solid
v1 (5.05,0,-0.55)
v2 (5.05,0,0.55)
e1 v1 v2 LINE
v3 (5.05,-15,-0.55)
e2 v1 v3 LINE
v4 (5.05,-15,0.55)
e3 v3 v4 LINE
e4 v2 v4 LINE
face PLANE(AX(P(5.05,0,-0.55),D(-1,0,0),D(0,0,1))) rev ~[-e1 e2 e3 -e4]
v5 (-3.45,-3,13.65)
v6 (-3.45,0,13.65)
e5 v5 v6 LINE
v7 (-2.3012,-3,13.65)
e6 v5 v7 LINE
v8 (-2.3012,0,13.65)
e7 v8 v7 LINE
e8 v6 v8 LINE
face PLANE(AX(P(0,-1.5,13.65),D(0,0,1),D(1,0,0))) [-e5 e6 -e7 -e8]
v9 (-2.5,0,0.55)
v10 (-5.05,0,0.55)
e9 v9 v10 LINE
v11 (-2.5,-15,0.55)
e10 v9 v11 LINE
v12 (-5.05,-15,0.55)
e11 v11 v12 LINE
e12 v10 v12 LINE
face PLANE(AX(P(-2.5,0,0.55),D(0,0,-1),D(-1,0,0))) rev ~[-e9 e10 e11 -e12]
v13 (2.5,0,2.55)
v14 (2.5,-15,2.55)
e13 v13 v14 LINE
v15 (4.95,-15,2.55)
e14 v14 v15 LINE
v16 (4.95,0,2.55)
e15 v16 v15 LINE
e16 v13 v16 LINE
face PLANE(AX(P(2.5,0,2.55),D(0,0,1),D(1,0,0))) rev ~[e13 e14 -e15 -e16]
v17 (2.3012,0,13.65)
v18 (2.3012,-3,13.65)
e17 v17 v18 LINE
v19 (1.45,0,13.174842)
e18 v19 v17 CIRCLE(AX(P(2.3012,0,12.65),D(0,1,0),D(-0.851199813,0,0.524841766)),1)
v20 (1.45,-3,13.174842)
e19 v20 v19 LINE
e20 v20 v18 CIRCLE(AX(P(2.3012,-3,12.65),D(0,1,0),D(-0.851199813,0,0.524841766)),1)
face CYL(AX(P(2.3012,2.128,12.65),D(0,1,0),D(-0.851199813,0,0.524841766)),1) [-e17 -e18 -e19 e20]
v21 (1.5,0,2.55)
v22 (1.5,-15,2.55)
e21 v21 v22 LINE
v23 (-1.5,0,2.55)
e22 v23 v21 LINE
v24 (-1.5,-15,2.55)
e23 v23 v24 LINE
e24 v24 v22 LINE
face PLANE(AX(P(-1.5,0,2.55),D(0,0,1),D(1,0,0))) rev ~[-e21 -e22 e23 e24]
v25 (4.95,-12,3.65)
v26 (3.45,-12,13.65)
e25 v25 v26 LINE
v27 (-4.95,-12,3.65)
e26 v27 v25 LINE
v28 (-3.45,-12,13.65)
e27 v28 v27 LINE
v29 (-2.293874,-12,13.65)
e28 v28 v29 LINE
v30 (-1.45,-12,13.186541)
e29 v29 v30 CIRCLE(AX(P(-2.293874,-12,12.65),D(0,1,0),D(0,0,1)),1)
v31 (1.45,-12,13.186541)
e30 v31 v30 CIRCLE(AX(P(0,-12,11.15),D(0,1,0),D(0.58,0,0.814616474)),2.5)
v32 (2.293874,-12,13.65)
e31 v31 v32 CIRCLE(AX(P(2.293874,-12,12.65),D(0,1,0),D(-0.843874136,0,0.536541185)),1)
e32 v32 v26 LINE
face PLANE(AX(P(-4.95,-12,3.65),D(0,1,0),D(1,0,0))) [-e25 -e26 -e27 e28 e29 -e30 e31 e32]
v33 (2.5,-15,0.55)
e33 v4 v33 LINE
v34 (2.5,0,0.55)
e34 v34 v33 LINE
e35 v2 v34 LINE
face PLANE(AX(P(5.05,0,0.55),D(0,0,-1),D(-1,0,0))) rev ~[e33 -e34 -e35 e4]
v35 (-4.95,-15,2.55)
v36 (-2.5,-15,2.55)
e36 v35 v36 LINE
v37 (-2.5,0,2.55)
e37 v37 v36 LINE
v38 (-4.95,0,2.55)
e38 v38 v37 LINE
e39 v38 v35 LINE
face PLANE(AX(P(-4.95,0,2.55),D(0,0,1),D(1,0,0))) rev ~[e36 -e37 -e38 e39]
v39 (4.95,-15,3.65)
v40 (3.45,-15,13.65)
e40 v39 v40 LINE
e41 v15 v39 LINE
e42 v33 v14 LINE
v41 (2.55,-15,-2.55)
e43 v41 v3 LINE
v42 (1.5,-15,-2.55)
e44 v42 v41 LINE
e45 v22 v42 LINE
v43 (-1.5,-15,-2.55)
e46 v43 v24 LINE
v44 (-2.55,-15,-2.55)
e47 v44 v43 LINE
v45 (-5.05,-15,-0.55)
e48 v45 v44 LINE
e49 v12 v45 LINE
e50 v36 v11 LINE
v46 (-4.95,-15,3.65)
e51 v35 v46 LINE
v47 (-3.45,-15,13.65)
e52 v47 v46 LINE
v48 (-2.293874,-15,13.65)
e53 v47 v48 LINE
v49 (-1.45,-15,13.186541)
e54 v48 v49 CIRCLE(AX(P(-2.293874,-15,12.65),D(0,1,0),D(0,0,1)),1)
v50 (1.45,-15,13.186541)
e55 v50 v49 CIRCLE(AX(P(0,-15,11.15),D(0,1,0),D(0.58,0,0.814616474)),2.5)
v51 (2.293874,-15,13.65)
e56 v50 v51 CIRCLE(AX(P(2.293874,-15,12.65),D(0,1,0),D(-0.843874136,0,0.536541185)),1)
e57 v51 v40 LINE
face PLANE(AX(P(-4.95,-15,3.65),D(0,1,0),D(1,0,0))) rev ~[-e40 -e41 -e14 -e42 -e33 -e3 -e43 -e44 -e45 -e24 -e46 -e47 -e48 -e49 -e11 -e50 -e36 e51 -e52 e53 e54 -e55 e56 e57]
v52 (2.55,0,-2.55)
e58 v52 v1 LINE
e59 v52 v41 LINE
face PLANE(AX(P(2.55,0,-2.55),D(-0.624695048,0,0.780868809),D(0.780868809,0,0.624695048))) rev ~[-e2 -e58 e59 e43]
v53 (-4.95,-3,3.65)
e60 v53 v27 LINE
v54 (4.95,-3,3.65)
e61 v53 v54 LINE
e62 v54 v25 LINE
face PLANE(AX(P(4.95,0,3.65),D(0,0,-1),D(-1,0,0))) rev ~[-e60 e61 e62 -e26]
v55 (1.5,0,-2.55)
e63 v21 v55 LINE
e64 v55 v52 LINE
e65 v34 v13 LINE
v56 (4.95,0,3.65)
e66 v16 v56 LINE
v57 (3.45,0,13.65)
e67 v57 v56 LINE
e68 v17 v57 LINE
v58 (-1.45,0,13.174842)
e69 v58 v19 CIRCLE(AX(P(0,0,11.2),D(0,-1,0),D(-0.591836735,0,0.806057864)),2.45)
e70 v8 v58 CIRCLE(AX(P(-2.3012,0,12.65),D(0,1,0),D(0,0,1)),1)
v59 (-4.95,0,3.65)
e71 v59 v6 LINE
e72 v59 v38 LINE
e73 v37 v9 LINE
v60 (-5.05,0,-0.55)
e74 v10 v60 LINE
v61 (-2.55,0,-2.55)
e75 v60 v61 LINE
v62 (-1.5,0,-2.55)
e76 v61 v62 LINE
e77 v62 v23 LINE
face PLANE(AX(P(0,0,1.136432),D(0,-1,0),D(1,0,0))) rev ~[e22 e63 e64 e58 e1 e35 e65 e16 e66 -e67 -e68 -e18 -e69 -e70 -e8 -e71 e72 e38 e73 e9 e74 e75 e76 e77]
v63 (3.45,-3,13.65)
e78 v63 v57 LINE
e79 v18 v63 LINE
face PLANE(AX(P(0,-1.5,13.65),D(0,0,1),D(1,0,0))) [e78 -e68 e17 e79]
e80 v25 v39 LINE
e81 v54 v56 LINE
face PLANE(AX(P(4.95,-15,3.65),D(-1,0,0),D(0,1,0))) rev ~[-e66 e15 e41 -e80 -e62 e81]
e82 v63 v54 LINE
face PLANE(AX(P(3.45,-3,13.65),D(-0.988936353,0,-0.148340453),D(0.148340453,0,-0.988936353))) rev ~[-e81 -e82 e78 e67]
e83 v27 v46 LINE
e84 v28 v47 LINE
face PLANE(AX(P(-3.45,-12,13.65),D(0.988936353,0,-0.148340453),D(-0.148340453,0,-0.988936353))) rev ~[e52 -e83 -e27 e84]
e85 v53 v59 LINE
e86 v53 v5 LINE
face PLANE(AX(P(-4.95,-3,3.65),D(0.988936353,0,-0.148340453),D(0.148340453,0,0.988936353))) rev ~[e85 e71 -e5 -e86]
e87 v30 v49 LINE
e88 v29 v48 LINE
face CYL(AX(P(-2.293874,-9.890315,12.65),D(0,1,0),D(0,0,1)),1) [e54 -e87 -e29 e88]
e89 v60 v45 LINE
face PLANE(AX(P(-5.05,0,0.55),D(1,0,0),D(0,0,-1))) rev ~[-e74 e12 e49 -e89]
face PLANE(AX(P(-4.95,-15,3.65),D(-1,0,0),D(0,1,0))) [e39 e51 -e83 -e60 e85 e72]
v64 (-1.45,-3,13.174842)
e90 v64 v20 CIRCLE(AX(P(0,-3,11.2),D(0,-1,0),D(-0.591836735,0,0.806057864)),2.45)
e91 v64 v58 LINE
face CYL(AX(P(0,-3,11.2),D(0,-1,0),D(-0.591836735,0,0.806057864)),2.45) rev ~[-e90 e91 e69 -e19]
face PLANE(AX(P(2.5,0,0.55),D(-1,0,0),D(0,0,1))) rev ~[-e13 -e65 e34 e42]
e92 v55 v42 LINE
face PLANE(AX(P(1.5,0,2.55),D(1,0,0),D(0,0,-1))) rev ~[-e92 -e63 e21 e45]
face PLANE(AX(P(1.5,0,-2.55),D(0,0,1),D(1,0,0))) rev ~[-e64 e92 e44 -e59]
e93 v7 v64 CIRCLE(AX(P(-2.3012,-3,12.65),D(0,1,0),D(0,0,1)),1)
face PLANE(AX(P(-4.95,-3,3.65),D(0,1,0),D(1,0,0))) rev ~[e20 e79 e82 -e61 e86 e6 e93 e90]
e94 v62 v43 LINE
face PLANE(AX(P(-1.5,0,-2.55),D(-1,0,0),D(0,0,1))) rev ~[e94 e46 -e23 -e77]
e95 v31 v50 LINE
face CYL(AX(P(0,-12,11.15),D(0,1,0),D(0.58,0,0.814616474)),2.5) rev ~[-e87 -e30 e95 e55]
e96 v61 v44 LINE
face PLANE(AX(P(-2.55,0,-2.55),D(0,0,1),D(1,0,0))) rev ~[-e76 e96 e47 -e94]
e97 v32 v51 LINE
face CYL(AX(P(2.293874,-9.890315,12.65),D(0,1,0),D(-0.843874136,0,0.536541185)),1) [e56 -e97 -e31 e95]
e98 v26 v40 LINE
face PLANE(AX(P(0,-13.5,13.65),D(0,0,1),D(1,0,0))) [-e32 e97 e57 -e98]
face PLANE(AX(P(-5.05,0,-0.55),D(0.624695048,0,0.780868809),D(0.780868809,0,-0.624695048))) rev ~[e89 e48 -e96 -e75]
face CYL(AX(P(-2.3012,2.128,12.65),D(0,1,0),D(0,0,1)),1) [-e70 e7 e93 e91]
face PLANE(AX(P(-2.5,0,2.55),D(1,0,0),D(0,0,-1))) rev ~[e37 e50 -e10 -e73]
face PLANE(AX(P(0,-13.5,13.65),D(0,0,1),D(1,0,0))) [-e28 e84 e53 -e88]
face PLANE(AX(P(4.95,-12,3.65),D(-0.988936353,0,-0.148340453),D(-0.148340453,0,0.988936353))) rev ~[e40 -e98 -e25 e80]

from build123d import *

# Parameters (mm, degrees)
F1_DEPTH     = 15
F3_DEPTH     = 25
F7_W         = 9.9
F7_H         = 3
F8_DEPTH     = 10
F10_DEPTH    = 3
F12_DEPTH    = 3
F13_T1_DEPTH = 7.2559990627
F13_T3_DEPTH = 7.2193706768


# Not quite as in the source:
# - a fillet or chamfer that OpenCascade refuses, or shapes differently, is made with other operations: its cross-section is extruded or revolved along the edge and cut away or added
# - a feature of the source that left no trace in its solid (it failed there, or was rolled back) is left out


with BuildPart() as f1:
    # F0 (on Front) → F1 (new body)
    with BuildSketch(Plane.XZ):
        Polygon((-2.5, 0.55), (-5.05, 0.55), (-5.05, -0.55), (-2.55, -2.55), (-1.5, -2.55), (-1.5, 2.55), (0, 2.55), (1.5, 2.55), (1.5, -2.55), (2.55, -2.55), (5.05, -0.55), (5.05, 0.55), (2.5, 0.55), (2.5, 2.55), (4.95, 2.55), (4.95, 3.65), (-4.95, 3.65), (-4.95, 2.55), (-2.5, 2.55), align=None)
    extrude(amount=F1_DEPTH)

    # F7 (on face) → F8 (join)
    with BuildSketch(Plane.XY.offset(3.65)):
        with Locations((0, -13.5)):
            Rectangle(F7_W, F7_H)
        with Locations((0, -1.5)):
            Rectangle(F7_W, F7_H)
    extrude(amount=F8_DEPTH)

    # F9 (on face) → F10 (cut, through all)
    with BuildSketch(Plane.XZ.offset(3)):
        with BuildLine():
            Line((-1.45, 13.65), (-1.45, 13.1748417658))
            ThreePointArc((-1.45, 13.1748417658), (0, 8.75), (1.45, 13.1748417658))
            Line((1.45, 13.1748417658), (1.45, 13.65))
            Line((1.45, 13.65), (-1.45, 13.65))
        make_face()
        Polygon((-4.95, 3.65), (-3.45, 13.65), (-4.95, 13.65), align=None)
        Polygon((4.95, 13.65), (3.45, 13.65), (4.95, 3.65), align=None)
    extrude(amount=-F10_DEPTH, mode=Mode.SUBTRACT)

    # F11 (on face) → F12 (cut, through all)
    with BuildSketch(Plane(origin=(0, -12, 0), x_dir=(-1, 0, 0), z_dir=(0, 1, 0))):
        with BuildLine():
            Line((-1.45, 13.65), (-1.45, 13.1865411854))
            ThreePointArc((-1.45, 13.1865411854), (0, 8.65), (1.45, 13.1865411854))
            Line((1.45, 13.1865411854), (1.45, 13.65))
            Line((1.45, 13.65), (-1.45, 13.65))
        make_face()
        Polygon((4.95, 13.65), (3.45, 13.65), (4.95, 3.65), align=None)
        Polygon((-4.95, 3.65), (-3.45, 13.65), (-4.95, 13.65), align=None)
    extrude(amount=-F12_DEPTH, mode=Mode.SUBTRACT)

    # F13: fillet of radius 1 on 4 edges, made by hand

    # F13_s2 → F13_t1 (cut)
    with BuildSketch(Plane.XZ.offset(-2.1279995313)):
        with BuildLine():
            ThreePointArc((1.45, 13.1748417658), (1.8137789296, 13.5231671563), (2.3011998125, 13.65))
            Line((2.3011998125, 13.65), (1.45, 13.65))
            Line((1.45, 13.65), (1.45, 13.1748417658))
        make_face()
        with BuildLine():
            ThreePointArc((-2.3011998125, 13.65), (-1.8137789296, 13.5231671563), (-1.45, 13.1748417658))
            Line((-1.45, 13.1748417658), (-1.45, 13.65))
            Line((-1.45, 13.65), (-2.3011998125, 13.65))
        make_face()
    extrude(amount=F13_T1_DEPTH, mode=Mode.SUBTRACT)

    # F13_s4 → F13_t3 (cut)
    with BuildSketch(Plane.XZ.offset(9.8903146616)):
        with BuildLine():
            ThreePointArc((1.45, 13.1865411854), (1.8124913279, 13.5265104636), (2.2938741354, 13.65))
            Line((2.2938741354, 13.65), (1.45, 13.65))
            Line((1.45, 13.65), (1.45, 13.1865411854))
        make_face()
        with BuildLine():
            ThreePointArc((-2.2938741354, 13.65), (-1.8124913279, 13.5265104636), (-1.45, 13.1865411854))
            Line((-1.45, 13.1865411854), (-1.45, 13.65))
            Line((-1.45, 13.65), (-2.2938741354, 13.65))
        make_face()
    extrude(amount=F13_T3_DEPTH, mode=Mode.SUBTRACT)


with BuildPart() as f3:
    # F2 (on face) → F3 (new body)
    with BuildSketch(Plane.XZ.offset(15)):
        with BuildLine():
            Line((-4.95, 3.65), (-4.0832418439, 3.65))
            Line((-4.0832418439, 3.65), (-0.75, 6.847274811))
            Line((-0.75, 6.847274811), (-0.75, 3.65))
            Line((-0.75, 3.65), (0.75, 3.65))
            Line((0.75, 3.65), (0.75, 6.828679691))
            Line((0.75, 6.828679691), (3.917720968, 3.65))
            Line((3.917720968, 3.65), (4.7647876878, 3.65))
            Line((4.7647876878, 3.65), (0.75, 7.6786768362))
            Line((0.75, 7.6786768362), (0.75, 7.9286768362))
            ThreePointArc((0.75, 7.9286768362), (0.6035533906, 8.2822302268), (0.25, 8.4286768362))
            Line((0.25, 8.4286768362), (-0.25, 8.4286768362))
            ThreePointArc((-0.25, 8.4286768362), (-0.6035533906, 8.2822302268), (-0.75, 7.9286768362))
            Line((-0.75, 7.9286768362), (-0.75, 7.6786768362))
            Line((-0.75, 7.6786768362), (-4.95, 3.65))
        make_face()
    extrude(amount=-F3_DEPTH)


solid = f1.part
